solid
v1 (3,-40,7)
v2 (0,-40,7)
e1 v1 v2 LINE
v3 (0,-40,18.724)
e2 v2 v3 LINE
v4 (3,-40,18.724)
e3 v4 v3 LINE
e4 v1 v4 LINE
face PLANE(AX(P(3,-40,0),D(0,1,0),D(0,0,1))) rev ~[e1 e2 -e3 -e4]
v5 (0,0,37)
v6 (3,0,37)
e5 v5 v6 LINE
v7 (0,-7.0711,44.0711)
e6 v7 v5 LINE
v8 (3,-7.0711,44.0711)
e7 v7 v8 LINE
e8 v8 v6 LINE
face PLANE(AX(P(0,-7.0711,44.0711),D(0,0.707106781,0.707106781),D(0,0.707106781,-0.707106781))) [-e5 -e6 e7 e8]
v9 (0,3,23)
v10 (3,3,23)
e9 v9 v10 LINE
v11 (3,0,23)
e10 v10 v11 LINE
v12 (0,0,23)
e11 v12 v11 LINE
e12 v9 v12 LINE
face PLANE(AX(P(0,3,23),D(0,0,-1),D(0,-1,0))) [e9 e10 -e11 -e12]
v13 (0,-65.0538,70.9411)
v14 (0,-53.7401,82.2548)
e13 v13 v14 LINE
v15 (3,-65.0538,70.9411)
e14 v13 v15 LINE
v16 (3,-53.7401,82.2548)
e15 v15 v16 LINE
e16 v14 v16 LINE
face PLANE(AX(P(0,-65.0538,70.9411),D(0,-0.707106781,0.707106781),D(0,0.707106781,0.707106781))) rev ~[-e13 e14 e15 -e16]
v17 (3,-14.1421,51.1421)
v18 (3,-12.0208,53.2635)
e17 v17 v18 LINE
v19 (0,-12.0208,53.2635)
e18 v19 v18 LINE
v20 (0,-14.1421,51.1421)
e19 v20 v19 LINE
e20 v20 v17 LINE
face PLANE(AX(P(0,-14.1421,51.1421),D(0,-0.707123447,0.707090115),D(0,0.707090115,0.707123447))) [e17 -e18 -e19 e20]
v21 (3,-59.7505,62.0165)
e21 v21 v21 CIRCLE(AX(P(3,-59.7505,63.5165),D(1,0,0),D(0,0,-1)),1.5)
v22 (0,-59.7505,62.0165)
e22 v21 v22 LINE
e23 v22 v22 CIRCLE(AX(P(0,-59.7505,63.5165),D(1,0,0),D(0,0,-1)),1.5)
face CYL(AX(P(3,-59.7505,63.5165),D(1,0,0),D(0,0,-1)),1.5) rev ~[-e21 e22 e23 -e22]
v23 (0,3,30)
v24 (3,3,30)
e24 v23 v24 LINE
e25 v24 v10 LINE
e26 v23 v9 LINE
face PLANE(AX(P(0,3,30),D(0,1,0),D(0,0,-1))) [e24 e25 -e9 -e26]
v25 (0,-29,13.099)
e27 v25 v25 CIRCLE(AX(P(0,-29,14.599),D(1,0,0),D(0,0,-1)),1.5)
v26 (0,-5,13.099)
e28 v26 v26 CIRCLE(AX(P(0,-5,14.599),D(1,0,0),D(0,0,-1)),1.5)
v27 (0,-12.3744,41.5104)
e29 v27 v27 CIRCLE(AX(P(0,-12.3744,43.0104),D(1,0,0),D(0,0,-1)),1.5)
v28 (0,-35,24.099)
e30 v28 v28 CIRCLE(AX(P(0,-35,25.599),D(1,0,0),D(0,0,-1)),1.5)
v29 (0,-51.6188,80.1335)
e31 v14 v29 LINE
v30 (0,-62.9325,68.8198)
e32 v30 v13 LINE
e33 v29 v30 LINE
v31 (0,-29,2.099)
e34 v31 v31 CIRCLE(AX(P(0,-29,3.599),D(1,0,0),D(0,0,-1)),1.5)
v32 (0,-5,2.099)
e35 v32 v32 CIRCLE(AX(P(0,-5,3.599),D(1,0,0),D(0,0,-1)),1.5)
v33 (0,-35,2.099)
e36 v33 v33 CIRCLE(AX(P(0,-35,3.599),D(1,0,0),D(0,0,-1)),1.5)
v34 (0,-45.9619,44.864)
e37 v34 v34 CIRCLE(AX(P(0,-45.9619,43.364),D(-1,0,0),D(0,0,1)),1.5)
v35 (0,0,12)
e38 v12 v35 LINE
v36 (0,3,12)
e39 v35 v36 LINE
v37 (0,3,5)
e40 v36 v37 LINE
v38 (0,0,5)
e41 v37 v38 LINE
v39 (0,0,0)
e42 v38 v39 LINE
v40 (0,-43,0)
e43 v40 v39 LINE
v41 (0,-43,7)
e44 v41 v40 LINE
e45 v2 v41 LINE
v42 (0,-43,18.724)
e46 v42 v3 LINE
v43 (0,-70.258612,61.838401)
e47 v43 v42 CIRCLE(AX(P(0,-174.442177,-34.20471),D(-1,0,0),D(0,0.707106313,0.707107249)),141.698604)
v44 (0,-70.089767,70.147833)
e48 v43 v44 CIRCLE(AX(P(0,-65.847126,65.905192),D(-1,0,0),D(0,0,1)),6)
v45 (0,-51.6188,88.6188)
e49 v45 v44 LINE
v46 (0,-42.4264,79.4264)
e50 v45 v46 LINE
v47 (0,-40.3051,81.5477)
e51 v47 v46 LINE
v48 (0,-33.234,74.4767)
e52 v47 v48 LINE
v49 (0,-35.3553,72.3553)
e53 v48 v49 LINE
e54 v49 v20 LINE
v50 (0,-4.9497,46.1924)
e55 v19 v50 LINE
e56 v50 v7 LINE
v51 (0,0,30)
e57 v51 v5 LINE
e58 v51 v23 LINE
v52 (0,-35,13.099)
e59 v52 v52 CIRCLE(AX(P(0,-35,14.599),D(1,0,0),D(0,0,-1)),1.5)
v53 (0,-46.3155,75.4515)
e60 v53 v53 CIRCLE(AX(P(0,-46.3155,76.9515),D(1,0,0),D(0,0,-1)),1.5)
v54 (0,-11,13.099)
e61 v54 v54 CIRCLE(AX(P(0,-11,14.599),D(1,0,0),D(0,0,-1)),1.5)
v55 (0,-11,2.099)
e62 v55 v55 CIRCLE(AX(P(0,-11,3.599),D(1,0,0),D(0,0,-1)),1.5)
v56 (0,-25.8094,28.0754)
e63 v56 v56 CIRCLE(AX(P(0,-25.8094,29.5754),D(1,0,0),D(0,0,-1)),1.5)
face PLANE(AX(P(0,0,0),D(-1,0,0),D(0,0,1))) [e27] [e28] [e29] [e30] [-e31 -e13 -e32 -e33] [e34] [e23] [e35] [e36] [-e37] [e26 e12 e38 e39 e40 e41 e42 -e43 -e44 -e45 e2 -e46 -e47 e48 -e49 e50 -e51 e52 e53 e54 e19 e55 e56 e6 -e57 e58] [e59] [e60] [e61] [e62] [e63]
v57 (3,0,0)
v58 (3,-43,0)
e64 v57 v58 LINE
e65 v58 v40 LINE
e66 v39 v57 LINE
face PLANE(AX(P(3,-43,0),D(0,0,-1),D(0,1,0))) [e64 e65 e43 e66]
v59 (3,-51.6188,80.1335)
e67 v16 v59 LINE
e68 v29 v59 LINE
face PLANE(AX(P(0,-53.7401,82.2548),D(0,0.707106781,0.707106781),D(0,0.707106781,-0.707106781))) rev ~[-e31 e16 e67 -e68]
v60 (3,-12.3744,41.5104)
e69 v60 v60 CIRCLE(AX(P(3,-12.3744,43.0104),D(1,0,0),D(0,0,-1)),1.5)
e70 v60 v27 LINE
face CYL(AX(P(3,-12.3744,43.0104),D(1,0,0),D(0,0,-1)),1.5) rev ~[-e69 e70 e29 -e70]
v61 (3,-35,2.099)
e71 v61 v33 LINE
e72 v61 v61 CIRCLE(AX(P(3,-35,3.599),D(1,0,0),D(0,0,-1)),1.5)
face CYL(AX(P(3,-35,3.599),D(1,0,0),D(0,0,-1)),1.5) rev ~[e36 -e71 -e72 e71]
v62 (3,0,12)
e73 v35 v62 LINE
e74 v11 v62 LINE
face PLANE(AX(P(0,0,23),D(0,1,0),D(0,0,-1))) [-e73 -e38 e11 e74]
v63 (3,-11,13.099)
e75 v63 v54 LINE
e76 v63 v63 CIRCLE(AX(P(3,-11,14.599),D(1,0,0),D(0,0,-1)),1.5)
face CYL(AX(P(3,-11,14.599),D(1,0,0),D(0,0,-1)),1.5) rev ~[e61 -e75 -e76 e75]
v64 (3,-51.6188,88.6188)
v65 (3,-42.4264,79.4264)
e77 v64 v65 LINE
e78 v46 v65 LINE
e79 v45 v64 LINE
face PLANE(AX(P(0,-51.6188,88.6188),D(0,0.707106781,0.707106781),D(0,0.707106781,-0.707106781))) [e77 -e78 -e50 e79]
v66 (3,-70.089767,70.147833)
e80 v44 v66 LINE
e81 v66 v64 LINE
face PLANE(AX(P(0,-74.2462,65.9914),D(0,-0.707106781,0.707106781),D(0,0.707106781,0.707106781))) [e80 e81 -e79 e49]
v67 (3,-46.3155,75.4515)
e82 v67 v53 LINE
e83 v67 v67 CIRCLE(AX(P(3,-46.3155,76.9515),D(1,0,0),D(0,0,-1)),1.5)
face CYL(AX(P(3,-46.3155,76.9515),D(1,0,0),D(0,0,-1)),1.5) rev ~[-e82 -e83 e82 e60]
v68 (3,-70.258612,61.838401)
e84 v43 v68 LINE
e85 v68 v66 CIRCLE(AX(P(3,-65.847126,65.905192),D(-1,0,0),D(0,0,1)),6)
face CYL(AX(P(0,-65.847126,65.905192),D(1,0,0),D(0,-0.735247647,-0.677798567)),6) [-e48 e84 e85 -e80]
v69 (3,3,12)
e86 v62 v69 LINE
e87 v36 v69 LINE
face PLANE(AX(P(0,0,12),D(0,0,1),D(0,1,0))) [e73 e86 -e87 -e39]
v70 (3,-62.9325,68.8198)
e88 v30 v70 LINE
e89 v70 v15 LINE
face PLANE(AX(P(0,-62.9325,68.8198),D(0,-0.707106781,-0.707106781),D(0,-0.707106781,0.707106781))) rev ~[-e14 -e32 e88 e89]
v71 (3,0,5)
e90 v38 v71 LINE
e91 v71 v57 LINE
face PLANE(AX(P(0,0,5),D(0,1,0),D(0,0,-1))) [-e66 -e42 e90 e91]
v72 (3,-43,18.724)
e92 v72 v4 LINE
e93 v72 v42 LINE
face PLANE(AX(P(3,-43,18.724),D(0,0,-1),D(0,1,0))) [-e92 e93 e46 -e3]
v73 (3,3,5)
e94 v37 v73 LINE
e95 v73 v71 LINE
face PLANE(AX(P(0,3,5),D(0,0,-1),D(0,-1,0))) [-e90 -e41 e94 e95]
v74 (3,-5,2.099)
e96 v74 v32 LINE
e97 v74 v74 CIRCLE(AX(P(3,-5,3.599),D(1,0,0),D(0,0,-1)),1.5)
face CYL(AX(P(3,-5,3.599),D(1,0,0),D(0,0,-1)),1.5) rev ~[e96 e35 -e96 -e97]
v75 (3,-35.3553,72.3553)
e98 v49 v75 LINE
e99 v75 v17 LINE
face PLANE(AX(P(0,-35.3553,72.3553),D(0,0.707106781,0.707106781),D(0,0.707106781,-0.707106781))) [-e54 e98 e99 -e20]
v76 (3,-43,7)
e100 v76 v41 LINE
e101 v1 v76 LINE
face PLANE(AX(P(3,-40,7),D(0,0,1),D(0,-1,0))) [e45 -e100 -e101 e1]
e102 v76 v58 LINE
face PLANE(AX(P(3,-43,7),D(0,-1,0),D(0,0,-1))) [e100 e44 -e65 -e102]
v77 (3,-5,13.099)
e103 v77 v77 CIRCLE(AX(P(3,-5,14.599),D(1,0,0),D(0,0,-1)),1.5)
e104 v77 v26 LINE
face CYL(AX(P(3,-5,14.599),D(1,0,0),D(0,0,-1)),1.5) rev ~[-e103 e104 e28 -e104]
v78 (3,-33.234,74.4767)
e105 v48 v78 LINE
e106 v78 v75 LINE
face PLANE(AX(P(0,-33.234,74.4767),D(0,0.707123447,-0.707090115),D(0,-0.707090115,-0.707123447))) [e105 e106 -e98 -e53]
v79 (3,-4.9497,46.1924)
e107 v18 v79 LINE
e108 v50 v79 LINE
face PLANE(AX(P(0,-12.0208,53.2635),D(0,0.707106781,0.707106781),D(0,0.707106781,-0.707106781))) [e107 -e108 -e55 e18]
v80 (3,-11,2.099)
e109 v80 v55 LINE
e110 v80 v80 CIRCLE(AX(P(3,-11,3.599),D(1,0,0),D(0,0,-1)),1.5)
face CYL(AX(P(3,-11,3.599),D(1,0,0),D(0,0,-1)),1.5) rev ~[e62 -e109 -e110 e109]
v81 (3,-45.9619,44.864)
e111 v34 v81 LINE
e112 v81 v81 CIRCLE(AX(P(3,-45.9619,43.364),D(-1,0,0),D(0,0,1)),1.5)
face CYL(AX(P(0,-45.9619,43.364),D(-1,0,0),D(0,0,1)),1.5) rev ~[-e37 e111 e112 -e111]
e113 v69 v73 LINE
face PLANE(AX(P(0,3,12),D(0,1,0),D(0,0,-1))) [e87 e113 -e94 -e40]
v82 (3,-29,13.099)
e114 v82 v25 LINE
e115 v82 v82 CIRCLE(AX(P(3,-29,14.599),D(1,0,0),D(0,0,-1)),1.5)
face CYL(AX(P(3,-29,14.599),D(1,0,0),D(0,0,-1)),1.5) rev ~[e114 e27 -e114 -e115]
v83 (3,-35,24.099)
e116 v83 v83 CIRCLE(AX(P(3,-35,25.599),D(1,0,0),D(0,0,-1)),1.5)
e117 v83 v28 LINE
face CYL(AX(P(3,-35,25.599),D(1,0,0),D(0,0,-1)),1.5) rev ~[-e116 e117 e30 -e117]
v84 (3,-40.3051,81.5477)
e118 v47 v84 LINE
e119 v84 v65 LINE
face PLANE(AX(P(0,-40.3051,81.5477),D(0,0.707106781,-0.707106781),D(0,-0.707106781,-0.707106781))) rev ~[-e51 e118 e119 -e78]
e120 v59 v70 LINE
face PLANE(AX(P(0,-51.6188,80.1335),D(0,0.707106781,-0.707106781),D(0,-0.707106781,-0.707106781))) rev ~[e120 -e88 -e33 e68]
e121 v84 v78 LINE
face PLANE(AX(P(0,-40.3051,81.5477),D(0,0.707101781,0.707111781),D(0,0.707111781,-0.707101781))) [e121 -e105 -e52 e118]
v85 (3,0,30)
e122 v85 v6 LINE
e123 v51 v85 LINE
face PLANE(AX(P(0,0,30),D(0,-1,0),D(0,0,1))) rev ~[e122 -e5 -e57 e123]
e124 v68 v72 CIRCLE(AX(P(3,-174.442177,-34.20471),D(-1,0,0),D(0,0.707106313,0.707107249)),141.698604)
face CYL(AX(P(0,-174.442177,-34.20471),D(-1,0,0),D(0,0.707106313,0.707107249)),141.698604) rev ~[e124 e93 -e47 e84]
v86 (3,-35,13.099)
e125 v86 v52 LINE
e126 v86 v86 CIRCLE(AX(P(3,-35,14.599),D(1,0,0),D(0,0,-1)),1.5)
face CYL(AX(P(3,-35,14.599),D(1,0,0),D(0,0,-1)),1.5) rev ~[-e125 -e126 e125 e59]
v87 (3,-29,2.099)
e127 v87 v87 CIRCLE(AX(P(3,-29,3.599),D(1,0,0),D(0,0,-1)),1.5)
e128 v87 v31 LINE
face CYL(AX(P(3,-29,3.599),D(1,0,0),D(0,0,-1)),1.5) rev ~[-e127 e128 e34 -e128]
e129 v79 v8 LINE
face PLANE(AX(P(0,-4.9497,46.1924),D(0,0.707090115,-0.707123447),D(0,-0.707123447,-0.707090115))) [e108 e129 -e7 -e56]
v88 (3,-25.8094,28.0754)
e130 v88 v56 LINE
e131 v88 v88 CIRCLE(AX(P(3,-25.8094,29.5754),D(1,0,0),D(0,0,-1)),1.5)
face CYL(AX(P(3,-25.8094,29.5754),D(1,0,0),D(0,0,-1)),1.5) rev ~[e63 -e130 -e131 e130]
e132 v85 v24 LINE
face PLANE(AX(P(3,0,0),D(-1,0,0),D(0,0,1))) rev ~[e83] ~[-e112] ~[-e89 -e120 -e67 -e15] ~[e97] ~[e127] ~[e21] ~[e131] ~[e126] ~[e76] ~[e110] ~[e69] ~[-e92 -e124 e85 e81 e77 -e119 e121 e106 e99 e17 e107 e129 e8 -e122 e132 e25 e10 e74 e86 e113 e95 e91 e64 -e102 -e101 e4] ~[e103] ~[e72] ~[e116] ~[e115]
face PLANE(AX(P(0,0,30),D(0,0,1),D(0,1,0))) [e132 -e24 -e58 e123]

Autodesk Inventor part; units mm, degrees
ref_plane "YZ Plane" through (0, 0, 0) normal (1, 0, 0) x (0, 1, 0)
ref_plane "XZ Plane" through (0, 0, 0) normal (0, 1, 0) x (-1, 0, 0)
ref_plane "XY Plane" through (0, 0, 0) normal (0, 0, 1) x (1, 0, 0)
sketch "Sketch1" plane through (0, 0, 0) normal (1, 0, 0) x (0, 1, 0)
  line L0 (-51.6188, 88.6188) -> (0, 37) construction
  line L1 (0, 37) -> (0, 0) construction
  line L2 (0, 0) -> (-40, 0)
  line L3 (-40, 0) -> (-71.4178, 68.8198)
  line L4 (-51.6188, 88.6188) -> (-42.4264, 79.4264)
  line L5 (-40.3051, 81.5477) -> (-42.4264, 79.4264)
  line L6 (-40.3051, 81.5477) -> (-33.234, 74.4767)
  line L7 (-33.234, 74.4767) -> (-35.3553, 72.3553)
  line L8 (-35.3553, 72.3553) -> (-14.1421, 51.1421)
  line L9 (-14.1421, 51.1421) -> (-12.0208, 53.2635)
  line L10 (-12.0208, 53.2635) -> (-4.9497, 46.1924)
  line L11 (-4.9497, 46.1924) -> (-7.0711, 44.0711)
  line L12 (-7.0711, 44.0711) -> (0, 37)
  line L13 (0, 30) -> (3, 30)
  line L14 (3, 30) -> (3, 23)
  line L15 (3, 23) -> (0, 23)
  line L16 (0, 23) -> (0, 12)
  line L17 (0, 12) -> (3, 12)
  line L18 (3, 12) -> (3, 5)
  line L19 (3, 5) -> (0, 5)
  line L20 (0, 5) -> (0, 0)
  line L21 (0, 30) -> (0, 37)
  line L22 (-51.6188, 88.6188) -> (-71.4178, 68.8198)
  line L23 (-53.7401, 82.2548) -> (-51.6188, 80.1335)
  line L24 (-51.6188, 80.1335) -> (-62.9325, 68.8198)
  line L25 (-62.9325, 68.8198) -> (-65.0538, 70.9411)
  line L26 (-65.0538, 70.9411) -> (-53.7401, 82.2548)
  dimension "d3" = 40
  dimension "d5" = 135
  dimension "d6" = 28
  dimension "d10" = 73
  dimension "d11" = 37
  dimension "d14" = 10
  dimension "d15" = 10
  dimension "d16" = 10
  dimension "d17" = 7
  dimension "d18" = 5
  dimension "d19" = 7
  dimension "d20" = 7
  dimension "d21" = 3
  dimension "d25" = 6
  dimension "d26" = 6
  dimension "d27" = 3
  dimension "d28" = 3
  dimension "d29" = 13
  dimension "d30" = 3
extrude "Extrusion1" add sketch "Sketch1" along normal blind 3
sketch "Sketch2" plane through (3, 0, 0) normal (1, 0, 0) x (0, 0, -1)
  circle A0 centre (-76.9515, -46.3155) radius 1.5
  line L0 (-76.9515, -46.3155) -> (-43.0104, -12.3744) construction
  line L1 (-43.0104, -12.3744) -> (-29.5754, -25.8094) construction
  line L2 (-29.5754, -25.8094) -> (-63.5165, -59.7505) construction
  line L3 (-63.5165, -59.7505) -> (-76.9515, -46.3155) construction
  line L4 (-51.1421, -14.1421) -> (-72.3553, -35.3553) construction
  line L5 (-80.1335, -51.6188) -> (-68.8198, -62.9325) construction
  circle A1 centre (-43.0104, -12.3744) radius 1.5
  circle A2 centre (-29.5754, -25.8094) radius 1.5
  circle A3 centre (-63.5165, -59.7505) radius 1.5
  point P0 (0, 0)
  dimension "d31" = 3
  dimension "d32" = 6
  dimension "d33" = 4.5
  dimension "d34" = 19
  dimension "d35" = 3
  dimension "d36" = 3
  dimension "d37" = 3
  dimension "d38" = 48
extrude "Extrusion2" cut sketch "Sketch2" against normal blind 3
sketch "Sketch3" plane through (3, 0, 0) normal (1, 0, 0) x (0, 0, -1)
  circle A0 centre (-29.5754, -25.8094) radius 1.5 projected
  circle A1 centre (-76.9515, -46.3155) radius 1.5 projected
  circle A2 centre (-43.0104, -12.3744) radius 1.5 projected
  circle A3 centre (-63.5165, -59.7505) radius 1.5 projected
  line L0 (-80.1335, -51.6188) -> (-68.8198, -62.9325) projected
  line L1 (-68.8198, -62.9325) -> (-70.9411, -65.0538) projected
  line L2 (-70.9411, -65.0538) -> (-82.2548, -53.7401) projected
  line L3 (-82.2548, -53.7401) -> (-80.1335, -51.6188) projected
  line L4 (-79.4264, -42.4264) -> (-88.6188, -51.6188) projected
  line L5 (-88.6188, -51.6188) -> (-68.8198, -71.4178) projected
  line L6 (-68.8198, -71.4178) -> (0, -40) projected
  line L7 (0, -40) -> (0, 0) projected
  line L8 (0, 0) -> (-5, 0) projected
  line L9 (-5, 0) -> (-5, 3) projected
  line L10 (-5, 3) -> (-12, 3) projected
  line L11 (-12, 3) -> (-12, 0) projected
  line L12 (-12, 0) -> (-23, 0) projected
  line L13 (-23, 0) -> (-23, 3) projected
  line L14 (-23, 3) -> (-30, 3) projected
  line L15 (-30, 3) -> (-30, 0) projected
  line L16 (-30, 0) -> (-37, 0) projected
  line L17 (-37, 0) -> (-44.0711, -7.0711) projected
  line L18 (-44.0711, -7.0711) -> (-46.1924, -4.9497) projected
  line L19 (-46.1924, -4.9497) -> (-53.2635, -12.0208) projected
  line L20 (-53.2635, -12.0208) -> (-51.1421, -14.1421) projected
  line L21 (-51.1421, -14.1421) -> (-72.3553, -35.3553) projected
  line L22 (-72.3553, -35.3553) -> (-74.4767, -33.234) projected
  line L23 (-74.4767, -33.234) -> (-81.5477, -40.3051) projected
  line L24 (-81.5477, -40.3051) -> (-79.4264, -42.4264) projected
  arc A4 (0, -40) -> (-68.8198, -71.4178) centre (7.69, -147.9276) ccw
  line L25 (-68.8198, -71.4178) -> (-27.8142, -30.4121)
  line L26 (-51.1421, -14.1421) -> (-72.3553, -35.3553) projected
extrude "Extrusion3" cut sketch "Sketch3" against normal blind 3 contours A4 L6
sketch "Sketch4" plane through (3, 0, 0) normal (1, 0, 0) x (0, 0, -1)
  arc A0 (0, -40) -> (-68.8198, -71.4178) centre (7.69, -147.9276) ccw projected
  line L0 (0, -40) -> (0, 0) projected
  line L1 (0, 0) -> (-5, 0) projected
  line L2 (-5, 0) -> (-5, 3) projected
  line L3 (-5, 3) -> (-12, 3) projected
  line L4 (-12, 3) -> (-12, 0) projected
  line L5 (-12, 0) -> (-23, 0) projected
  line L6 (-23, 0) -> (-23, 3) projected
  line L7 (-23, 3) -> (-30, 3) projected
  line L8 (-30, 3) -> (-30, 0) projected
  line L9 (-30, 0) -> (-37, 0) projected
  line L10 (-37, 0) -> (-44.0711, -7.0711) projected
  line L11 (-44.0711, -7.0711) -> (-46.1924, -4.9497) projected
  line L12 (-46.1924, -4.9497) -> (-53.2635, -12.0208) projected
  line L13 (-53.2635, -12.0208) -> (-51.1421, -14.1421) projected
  line L14 (-51.1421, -14.1421) -> (-72.3553, -35.3553) projected
  line L15 (-72.3553, -35.3553) -> (-74.4767, -33.234) projected
  line L16 (-74.4767, -33.234) -> (-81.5477, -40.3051) projected
  line L17 (-81.5477, -40.3051) -> (-79.4264, -42.4264) projected
  line L18 (-79.4264, -42.4264) -> (-88.6188, -51.6188) projected
  line L19 (-88.6188, -51.6188) -> (-68.8198, -71.4178) projected
  circle A1 centre (-29.5754, -25.8094) radius 1.5 projected
  circle A2 centre (-76.9515, -46.3155) radius 1.5 projected
  circle A3 centre (-43.0104, -12.3744) radius 1.5 projected
  circle A4 centre (-63.5165, -59.7505) radius 1.5 projected
  line L20 (-80.1335, -51.6188) -> (-68.8198, -62.9325) projected
  line L21 (-68.8198, -62.9325) -> (-70.9411, -65.0538) projected
  line L22 (-70.9411, -65.0538) -> (-82.2548, -53.7401) projected
  line L23 (-82.2548, -53.7401) -> (-80.1335, -51.6188) projected
  line L24 (0, -40) -> (-18.724, -40)
  line L25 (-18.724, -43) -> (0, -43)
  line L26 (0, -43) -> (0, -40)
  line L27 (-18.724, -43) -> (-18.724, -40)
  dimension "d44" = 3
extrude "Extrusion4" cut sketch "Sketch4" against normal blind 3 contours L26 L25 A0 | A0 L27 L24
sketch "Sketch5" plane through (3, 0, 0) normal (1, 0, 0) x (0, 0, -1)
  line L0 (-80.1335, -51.6188) -> (-68.8198, -62.9325) projected
  line L1 (-68.8198, -62.9325) -> (-70.9411, -65.0538) projected
  line L2 (-70.9411, -65.0538) -> (-82.2548, -53.7401) projected
  line L3 (-82.2548, -53.7401) -> (-80.1335, -51.6188) projected
  circle A0 centre (-63.5165, -59.7505) radius 1.5 projected
  circle A1 centre (-43.0104, -12.3744) radius 1.5 projected
  circle A2 centre (-76.9515, -46.3155) radius 1.5 projected
  circle A3 centre (-29.5754, -25.8094) radius 1.5 projected
  line L4 (-18.724, -43) -> (-18.724, -40) projected
  line L5 (-18.724, -40) -> (0, -40) projected
  line L6 (0, -40) -> (0, 0) projected
  line L7 (0, 0) -> (-5, 0) projected
  line L8 (-5, 0) -> (-5, 3) projected
  line L9 (-5, 3) -> (-12, 3) projected
  line L10 (-12, 3) -> (-12, 0) projected
  line L11 (-12, 0) -> (-23, 0) projected
  line L12 (-23, 0) -> (-23, 3) projected
  line L13 (-23, 3) -> (-30, 3) projected
  line L14 (-30, 3) -> (-30, 0) projected
  line L15 (-30, 0) -> (-37, 0) projected
  line L16 (-37, 0) -> (-44.0711, -7.0711) projected
  line L17 (-44.0711, -7.0711) -> (-46.1924, -4.9497) projected
  line L18 (-46.1924, -4.9497) -> (-53.2635, -12.0208) projected
  line L19 (-53.2635, -12.0208) -> (-51.1421, -14.1421) projected
  line L20 (-51.1421, -14.1421) -> (-72.3553, -35.3553) projected
  line L21 (-72.3553, -35.3553) -> (-74.4767, -33.234) projected
  line L22 (-74.4767, -33.234) -> (-81.5477, -40.3051) projected
  line L23 (-81.5477, -40.3051) -> (-79.4264, -42.4264) projected
  line L24 (-79.4264, -42.4264) -> (-88.6188, -51.6188) projected
  line L25 (-88.6188, -51.6188) -> (-68.8198, -71.4178) projected
  arc A4 (-18.724, -43) -> (-68.8198, -71.4178) centre (7.69, -147.9276) ccw projected
  line L26 (0, -40) -> (-18.724, -40) projected
  line L27 (0, -40) -> (-7, -40)
  line L28 (-7, -40) -> (-7, -43)
  line L29 (-7, -43) -> (0, -43)
  line L30 (0, -43) -> (0, -40)
  dimension "d47" = 3
  dimension "d48" = 7
extrude "Extrusion5" add sketch "Sketch5" against normal blind 3 contours L5 L30 L29 L28
sketch "Sketch6" plane through (3, 0, 0) normal (1, 0, 0) x (0, 0, -1)
  line L0 (-14.599, -5) -> (-3.599, -5) construction
  line L1 (-3.599, -5) -> (-3.599, -35) construction
  line L2 (-3.599, -35) -> (-14.599, -35) construction
  line L3 (-14.599, -35) -> (-14.599, -5) construction
  circle A0 centre (-3.599, -5) radius 1.5
  circle A1 centre (-14.599, -5) radius 1.5
  circle A2 centre (-14.599, -35) radius 1.5
  circle A3 centre (-14.599, -29) radius 1.5
  circle A4 centre (-14.599, -11) radius 1.5
  circle A5 centre (-3.599, -11) radius 1.5
  circle A6 centre (-3.599, -29) radius 1.5
  circle A7 centre (-3.599, -35) radius 1.5
  line L4 (0, 0) -> (0, -43) projected
  line L5 (-5, 0) -> (0, 0) projected
  line L6 (0, -43) -> (-7, -43) projected
  circle A8 centre (-25.599, -35) radius 1.5
  line L7 (-7, -43) -> (-7, -40) projected
  line L8 (-18.724, -40) -> (-18.724, -43) projected
  dimension "d51" = 3
  dimension "d52" = 3
  dimension "d53" = 3
  dimension "d54" = 3
  dimension "d55" = 3
  dimension "d56" = 3
  dimension "d57" = 3
  dimension "d58" = 3
  dimension "d59" = 3
  dimension "d62" = 3.599
  dimension "d63" = 5
  dimension "d64" = 11
  dimension "d65" = 6
  dimension "d66" = 6
  dimension "d67" = 5
  dimension "d68" = 11
extrude "Extrusion6" cut sketch "Sketch6" against normal blind 3
sketch "Sketch8" plane through (0, 0, 0) normal (-1, 0, 0) x (0, 0, 1)
  line L0 (68.8198, -71.4178) -> (48.209, -50.807)
  line L1 (48.209, -50.807) -> (45.3806, -53.6354)
  line L2 (45.3806, -53.6354) -> (65.9914, -74.2462)
  line L3 (65.9914, -74.2462) -> (68.8198, -71.4178)
  line L4 (88.6188, -51.6188) -> (68.8198, -71.4178) projected
  arc A0 (68.8198, -71.4178) -> (18.724, -43) centre (-7.69, -147.9276) ccw projected
  point P0 (0, 0)
  dimension "d70" = 4
extrude "Extrusion7" add sketch "Sketch8" against normal blind 3 contours L3 L2 A0
sketch "Sketch9" plane through (0, 0, 0) normal (-1, 0, 0) x (0, 0, 1)
  circle A0 centre (3.599, -35) radius 1.5 projected
  circle A1 centre (3.599, -11) radius 1.5 projected
  circle A2 centre (14.599, -29) radius 1.5 projected
  circle A3 centre (14.599, -5) radius 1.5 projected
  circle A4 centre (3.599, -5) radius 1.5 projected
  circle A5 centre (14.599, -35) radius 1.5 projected
  circle A6 centre (14.599, -11) radius 1.5 projected
  circle A7 centre (3.599, -29) radius 1.5 projected
  circle A8 centre (25.599, -35) radius 1.5 projected
  line L0 (18.724, -40) -> (18.724, -43) projected
  arc A9 (45.3806, -53.6354) -> (18.724, -43) centre (-7.69, -147.9276) ccw projected
  line L1 (45.3806, -53.6354) -> (65.9914, -74.2462) projected
  line L2 (65.9914, -74.2462) -> (88.6188, -51.6188) projected
  line L3 (88.6188, -51.6188) -> (79.4264, -42.4264) projected
  line L4 (79.4264, -42.4264) -> (81.5477, -40.3051) projected
  line L5 (81.5477, -40.3051) -> (74.4767, -33.234) projected
  line L6 (74.4767, -33.234) -> (72.3553, -35.3553) projected
  line L7 (72.3553, -35.3553) -> (51.1421, -14.1421) projected
  line L8 (51.1421, -14.1421) -> (53.2635, -12.0208) projected
  line L9 (53.2635, -12.0208) -> (46.1924, -4.9497) projected
  line L10 (46.1924, -4.9497) -> (44.0711, -7.0711) projected
  line L11 (44.0711, -7.0711) -> (37, 0) projected
  line L12 (37, 0) -> (30, 0) projected
  line L13 (30, 0) -> (30, 3) projected
  line L14 (30, 3) -> (23, 3) projected
  line L15 (23, 3) -> (23, 0) projected
  line L16 (23, 0) -> (12, 0) projected
  line L17 (12, 0) -> (12, 3) projected
  line L18 (12, 3) -> (5, 3) projected
  line L19 (5, 3) -> (5, 0) projected
  line L20 (5, 0) -> (0, 0) projected
  line L21 (0, 0) -> (0, -43) projected
  line L22 (0, -43) -> (7, -43) projected
  line L23 (7, -43) -> (7, -40) projected
  line L24 (7, -40) -> (18.724, -40) projected
  line L25 (68.8198, -62.9325) -> (80.1335, -51.6188) projected
  line L26 (80.1335, -51.6188) -> (82.2548, -53.7401) projected
  line L27 (82.2548, -53.7401) -> (70.9411, -65.0538) projected
  line L28 (70.9411, -65.0538) -> (68.8198, -62.9325) projected
  circle A10 centre (63.5165, -59.7505) radius 1.5 projected
  circle A11 centre (43.0104, -12.3744) radius 1.5 projected
  circle A12 centre (76.9515, -46.3155) radius 1.5 projected
  circle A13 centre (29.5754, -25.8094) radius 1.5 projected
  arc A14 (65.9914, -74.2462) -> (18.724, -43) centre (-34.2053, -174.4429) ccw
extrude "Extrusion8" add sketch "Sketch9" against normal blind 3 contours A9 L1 A14
sketch "Sketch10" plane through (0, 0, 0) normal (-1, 0, 0) x (0, 0, 1)
  circle A0 centre (3.599, -35) radius 1.5 projected
  circle A1 centre (3.599, -11) radius 1.5 projected
  circle A2 centre (14.599, -29) radius 1.5 projected
  circle A3 centre (14.599, -5) radius 1.5 projected
  circle A4 centre (3.599, -5) radius 1.5 projected
  circle A5 centre (14.599, -35) radius 1.5 projected
  circle A6 centre (14.599, -11) radius 1.5 projected
  circle A7 centre (3.599, -29) radius 1.5 projected
  circle A8 centre (25.599, -35) radius 1.5 projected
  line L0 (18.724, -40) -> (18.724, -43) projected
  arc A9 (65.9914, -74.2462) -> (18.724, -43) centre (-34.2053, -174.4429) ccw projected
  line L1 (65.9914, -74.2462) -> (88.6188, -51.6188) projected
  line L2 (88.6188, -51.6188) -> (79.4264, -42.4264) projected
  line L3 (79.4264, -42.4264) -> (81.5477, -40.3051) projected
  line L4 (81.5477, -40.3051) -> (74.4767, -33.234) projected
  line L5 (74.4767, -33.234) -> (72.3553, -35.3553) projected
  line L6 (72.3553, -35.3553) -> (51.1421, -14.1421) projected
  line L7 (51.1421, -14.1421) -> (53.2635, -12.0208) projected
  line L8 (53.2635, -12.0208) -> (46.1924, -4.9497) projected
  line L9 (46.1924, -4.9497) -> (44.0711, -7.0711) projected
  line L10 (44.0711, -7.0711) -> (37, 0) projected
  line L11 (37, 0) -> (30, 0) projected
  line L12 (30, 0) -> (30, 3) projected
  line L13 (30, 3) -> (23, 3) projected
  line L14 (23, 3) -> (23, 0) projected
  line L15 (23, 0) -> (12, 0) projected
  line L16 (12, 0) -> (12, 3) projected
  line L17 (12, 3) -> (5, 3) projected
  line L18 (5, 3) -> (5, 0) projected
  line L19 (5, 0) -> (0, 0) projected
  line L20 (0, 0) -> (0, -43) projected
  line L21 (0, -43) -> (7, -43) projected
  line L22 (7, -43) -> (7, -40) projected
  line L23 (7, -40) -> (18.724, -40) projected
  line L24 (68.8198, -62.9325) -> (80.1335, -51.6188) projected
  line L25 (80.1335, -51.6188) -> (82.2548, -53.7401) projected
  line L26 (82.2548, -53.7401) -> (70.9411, -65.0538) projected
  line L27 (70.9411, -65.0538) -> (68.8198, -62.9325) projected
  circle A10 centre (63.5165, -59.7505) radius 1.5 projected
  circle A11 centre (43.0104, -12.3744) radius 1.5 projected
  circle A12 centre (76.9515, -46.3155) radius 1.5 projected
  circle A13 centre (29.5754, -25.8094) radius 1.5 projected
  circle A14 centre (43.364, -45.9619) radius 1.5
  dimension "d75" = 28
  dimension "d76" = 3
  dimension "d77" = 36
extrude "Extrusion9" cut sketch "Sketch10" against normal blind 3 contours A14
fillet "Fillet2" radius 6 1 edges at (1.5, -74.2462, 65.9914)
sketch "Sketch11" plane through (3, 0, 0) normal (1, 0, 0) x (0, 0, -1)
  arc A0 (-70.1478, -70.0898) -> (-61.8384, -70.2586) centre (-65.9052, -65.8471) ccw projected
  arc A1 (-18.724, -43) -> (-61.8384, -70.2586) centre (34.2053, -174.4429) ccw projected
  line L0 (-18.724, -43) -> (-18.724, -40) projected
  line L1 (-18.724, -40) -> (-7, -40) projected
  line L2 (-7, -40) -> (-7, -43) projected
  line L3 (-7, -43) -> (0, -43) projected
  line L4 (0, -43) -> (0, 0) projected
  line L5 (0, 0) -> (-5, 0) projected
  line L6 (-5, 0) -> (-5, 3) projected
  line L7 (-5, 3) -> (-12, 3) projected
  line L8 (-12, 3) -> (-12, 0) projected
  line L9 (-12, 0) -> (-23, 0) projected
  line L10 (-23, 0) -> (-23, 3) projected
  line L11 (-23, 3) -> (-30, 3) projected
  line L12 (-30, 3) -> (-30, 0) projected
  line L13 (-30, 0) -> (-37, 0) projected
  line L14 (-37, 0) -> (-44.0711, -7.0711) projected
  line L15 (-44.0711, -7.0711) -> (-46.1924, -4.9497) projected
  line L16 (-46.1924, -4.9497) -> (-53.2635, -12.0208) projected
  line L17 (-53.2635, -12.0208) -> (-51.1421, -14.1421) projected
  line L18 (-51.1421, -14.1421) -> (-72.3553, -35.3553) projected
  line L19 (-72.3553, -35.3553) -> (-74.4767, -33.234) projected
  line L20 (-74.4767, -33.234) -> (-81.5477, -40.3051) projected
  line L21 (-81.5477, -40.3051) -> (-79.4264, -42.4264) projected
  line L22 (-79.4264, -42.4264) -> (-88.6188, -51.6188) projected
  line L23 (-88.6188, -51.6188) -> (-70.1478, -70.0898) projected
  circle A2 centre (-29.5754, -25.8094) radius 1.5 projected
  circle A3 centre (-76.9515, -46.3155) radius 1.5 projected
  circle A4 centre (-43.0104, -12.3744) radius 1.5 projected
  circle A5 centre (-63.5165, -59.7505) radius 1.5 projected
  line L24 (-80.1335, -51.6188) -> (-68.8198, -62.9325) projected
  line L25 (-68.8198, -62.9325) -> (-70.9411, -65.0538) projected
  line L26 (-70.9411, -65.0538) -> (-82.2548, -53.7401) projected
  line L27 (-82.2548, -53.7401) -> (-80.1335, -51.6188) projected
  circle A6 centre (-25.599, -35) radius 1.5 projected
  circle A7 centre (-3.599, -29) radius 1.5 projected
  circle A8 centre (-14.599, -11) radius 1.5 projected
  circle A9 centre (-14.599, -35) radius 1.5 projected
  circle A10 centre (-3.599, -5) radius 1.5 projected
  circle A11 centre (-14.599, -5) radius 1.5 projected
  circle A12 centre (-14.599, -29) radius 1.5 projected
  circle A13 centre (-3.599, -11) radius 1.5 projected
  circle A14 centre (-3.599, -35) radius 1.5 projected
  circle A15 centre (-43.364, -45.9619) radius 1.5 projected
equation "\"d21\" = d8"
equation "\"d26\" = d25"
equation "\"d30\" = d28"
equation "\"d35\" = d31"
equation "\"d36\" = d31"
equation "\"d37\" = d31"
equation "\"d52\" = d51"
equation "\"d53\" = d51"
equation "\"d54\" = d51"
equation "\"d55\" = d51"
equation "\"d56\" = d51"
equation "\"d57\" = d51"
equation "\"d58\" = d51"
equation "\"d59\" = d51"
equation "\"d67\" = d63"
equation "\"d8\" = 3"
properties part number "motor mount side" material "Polycarbonate, Clear"
